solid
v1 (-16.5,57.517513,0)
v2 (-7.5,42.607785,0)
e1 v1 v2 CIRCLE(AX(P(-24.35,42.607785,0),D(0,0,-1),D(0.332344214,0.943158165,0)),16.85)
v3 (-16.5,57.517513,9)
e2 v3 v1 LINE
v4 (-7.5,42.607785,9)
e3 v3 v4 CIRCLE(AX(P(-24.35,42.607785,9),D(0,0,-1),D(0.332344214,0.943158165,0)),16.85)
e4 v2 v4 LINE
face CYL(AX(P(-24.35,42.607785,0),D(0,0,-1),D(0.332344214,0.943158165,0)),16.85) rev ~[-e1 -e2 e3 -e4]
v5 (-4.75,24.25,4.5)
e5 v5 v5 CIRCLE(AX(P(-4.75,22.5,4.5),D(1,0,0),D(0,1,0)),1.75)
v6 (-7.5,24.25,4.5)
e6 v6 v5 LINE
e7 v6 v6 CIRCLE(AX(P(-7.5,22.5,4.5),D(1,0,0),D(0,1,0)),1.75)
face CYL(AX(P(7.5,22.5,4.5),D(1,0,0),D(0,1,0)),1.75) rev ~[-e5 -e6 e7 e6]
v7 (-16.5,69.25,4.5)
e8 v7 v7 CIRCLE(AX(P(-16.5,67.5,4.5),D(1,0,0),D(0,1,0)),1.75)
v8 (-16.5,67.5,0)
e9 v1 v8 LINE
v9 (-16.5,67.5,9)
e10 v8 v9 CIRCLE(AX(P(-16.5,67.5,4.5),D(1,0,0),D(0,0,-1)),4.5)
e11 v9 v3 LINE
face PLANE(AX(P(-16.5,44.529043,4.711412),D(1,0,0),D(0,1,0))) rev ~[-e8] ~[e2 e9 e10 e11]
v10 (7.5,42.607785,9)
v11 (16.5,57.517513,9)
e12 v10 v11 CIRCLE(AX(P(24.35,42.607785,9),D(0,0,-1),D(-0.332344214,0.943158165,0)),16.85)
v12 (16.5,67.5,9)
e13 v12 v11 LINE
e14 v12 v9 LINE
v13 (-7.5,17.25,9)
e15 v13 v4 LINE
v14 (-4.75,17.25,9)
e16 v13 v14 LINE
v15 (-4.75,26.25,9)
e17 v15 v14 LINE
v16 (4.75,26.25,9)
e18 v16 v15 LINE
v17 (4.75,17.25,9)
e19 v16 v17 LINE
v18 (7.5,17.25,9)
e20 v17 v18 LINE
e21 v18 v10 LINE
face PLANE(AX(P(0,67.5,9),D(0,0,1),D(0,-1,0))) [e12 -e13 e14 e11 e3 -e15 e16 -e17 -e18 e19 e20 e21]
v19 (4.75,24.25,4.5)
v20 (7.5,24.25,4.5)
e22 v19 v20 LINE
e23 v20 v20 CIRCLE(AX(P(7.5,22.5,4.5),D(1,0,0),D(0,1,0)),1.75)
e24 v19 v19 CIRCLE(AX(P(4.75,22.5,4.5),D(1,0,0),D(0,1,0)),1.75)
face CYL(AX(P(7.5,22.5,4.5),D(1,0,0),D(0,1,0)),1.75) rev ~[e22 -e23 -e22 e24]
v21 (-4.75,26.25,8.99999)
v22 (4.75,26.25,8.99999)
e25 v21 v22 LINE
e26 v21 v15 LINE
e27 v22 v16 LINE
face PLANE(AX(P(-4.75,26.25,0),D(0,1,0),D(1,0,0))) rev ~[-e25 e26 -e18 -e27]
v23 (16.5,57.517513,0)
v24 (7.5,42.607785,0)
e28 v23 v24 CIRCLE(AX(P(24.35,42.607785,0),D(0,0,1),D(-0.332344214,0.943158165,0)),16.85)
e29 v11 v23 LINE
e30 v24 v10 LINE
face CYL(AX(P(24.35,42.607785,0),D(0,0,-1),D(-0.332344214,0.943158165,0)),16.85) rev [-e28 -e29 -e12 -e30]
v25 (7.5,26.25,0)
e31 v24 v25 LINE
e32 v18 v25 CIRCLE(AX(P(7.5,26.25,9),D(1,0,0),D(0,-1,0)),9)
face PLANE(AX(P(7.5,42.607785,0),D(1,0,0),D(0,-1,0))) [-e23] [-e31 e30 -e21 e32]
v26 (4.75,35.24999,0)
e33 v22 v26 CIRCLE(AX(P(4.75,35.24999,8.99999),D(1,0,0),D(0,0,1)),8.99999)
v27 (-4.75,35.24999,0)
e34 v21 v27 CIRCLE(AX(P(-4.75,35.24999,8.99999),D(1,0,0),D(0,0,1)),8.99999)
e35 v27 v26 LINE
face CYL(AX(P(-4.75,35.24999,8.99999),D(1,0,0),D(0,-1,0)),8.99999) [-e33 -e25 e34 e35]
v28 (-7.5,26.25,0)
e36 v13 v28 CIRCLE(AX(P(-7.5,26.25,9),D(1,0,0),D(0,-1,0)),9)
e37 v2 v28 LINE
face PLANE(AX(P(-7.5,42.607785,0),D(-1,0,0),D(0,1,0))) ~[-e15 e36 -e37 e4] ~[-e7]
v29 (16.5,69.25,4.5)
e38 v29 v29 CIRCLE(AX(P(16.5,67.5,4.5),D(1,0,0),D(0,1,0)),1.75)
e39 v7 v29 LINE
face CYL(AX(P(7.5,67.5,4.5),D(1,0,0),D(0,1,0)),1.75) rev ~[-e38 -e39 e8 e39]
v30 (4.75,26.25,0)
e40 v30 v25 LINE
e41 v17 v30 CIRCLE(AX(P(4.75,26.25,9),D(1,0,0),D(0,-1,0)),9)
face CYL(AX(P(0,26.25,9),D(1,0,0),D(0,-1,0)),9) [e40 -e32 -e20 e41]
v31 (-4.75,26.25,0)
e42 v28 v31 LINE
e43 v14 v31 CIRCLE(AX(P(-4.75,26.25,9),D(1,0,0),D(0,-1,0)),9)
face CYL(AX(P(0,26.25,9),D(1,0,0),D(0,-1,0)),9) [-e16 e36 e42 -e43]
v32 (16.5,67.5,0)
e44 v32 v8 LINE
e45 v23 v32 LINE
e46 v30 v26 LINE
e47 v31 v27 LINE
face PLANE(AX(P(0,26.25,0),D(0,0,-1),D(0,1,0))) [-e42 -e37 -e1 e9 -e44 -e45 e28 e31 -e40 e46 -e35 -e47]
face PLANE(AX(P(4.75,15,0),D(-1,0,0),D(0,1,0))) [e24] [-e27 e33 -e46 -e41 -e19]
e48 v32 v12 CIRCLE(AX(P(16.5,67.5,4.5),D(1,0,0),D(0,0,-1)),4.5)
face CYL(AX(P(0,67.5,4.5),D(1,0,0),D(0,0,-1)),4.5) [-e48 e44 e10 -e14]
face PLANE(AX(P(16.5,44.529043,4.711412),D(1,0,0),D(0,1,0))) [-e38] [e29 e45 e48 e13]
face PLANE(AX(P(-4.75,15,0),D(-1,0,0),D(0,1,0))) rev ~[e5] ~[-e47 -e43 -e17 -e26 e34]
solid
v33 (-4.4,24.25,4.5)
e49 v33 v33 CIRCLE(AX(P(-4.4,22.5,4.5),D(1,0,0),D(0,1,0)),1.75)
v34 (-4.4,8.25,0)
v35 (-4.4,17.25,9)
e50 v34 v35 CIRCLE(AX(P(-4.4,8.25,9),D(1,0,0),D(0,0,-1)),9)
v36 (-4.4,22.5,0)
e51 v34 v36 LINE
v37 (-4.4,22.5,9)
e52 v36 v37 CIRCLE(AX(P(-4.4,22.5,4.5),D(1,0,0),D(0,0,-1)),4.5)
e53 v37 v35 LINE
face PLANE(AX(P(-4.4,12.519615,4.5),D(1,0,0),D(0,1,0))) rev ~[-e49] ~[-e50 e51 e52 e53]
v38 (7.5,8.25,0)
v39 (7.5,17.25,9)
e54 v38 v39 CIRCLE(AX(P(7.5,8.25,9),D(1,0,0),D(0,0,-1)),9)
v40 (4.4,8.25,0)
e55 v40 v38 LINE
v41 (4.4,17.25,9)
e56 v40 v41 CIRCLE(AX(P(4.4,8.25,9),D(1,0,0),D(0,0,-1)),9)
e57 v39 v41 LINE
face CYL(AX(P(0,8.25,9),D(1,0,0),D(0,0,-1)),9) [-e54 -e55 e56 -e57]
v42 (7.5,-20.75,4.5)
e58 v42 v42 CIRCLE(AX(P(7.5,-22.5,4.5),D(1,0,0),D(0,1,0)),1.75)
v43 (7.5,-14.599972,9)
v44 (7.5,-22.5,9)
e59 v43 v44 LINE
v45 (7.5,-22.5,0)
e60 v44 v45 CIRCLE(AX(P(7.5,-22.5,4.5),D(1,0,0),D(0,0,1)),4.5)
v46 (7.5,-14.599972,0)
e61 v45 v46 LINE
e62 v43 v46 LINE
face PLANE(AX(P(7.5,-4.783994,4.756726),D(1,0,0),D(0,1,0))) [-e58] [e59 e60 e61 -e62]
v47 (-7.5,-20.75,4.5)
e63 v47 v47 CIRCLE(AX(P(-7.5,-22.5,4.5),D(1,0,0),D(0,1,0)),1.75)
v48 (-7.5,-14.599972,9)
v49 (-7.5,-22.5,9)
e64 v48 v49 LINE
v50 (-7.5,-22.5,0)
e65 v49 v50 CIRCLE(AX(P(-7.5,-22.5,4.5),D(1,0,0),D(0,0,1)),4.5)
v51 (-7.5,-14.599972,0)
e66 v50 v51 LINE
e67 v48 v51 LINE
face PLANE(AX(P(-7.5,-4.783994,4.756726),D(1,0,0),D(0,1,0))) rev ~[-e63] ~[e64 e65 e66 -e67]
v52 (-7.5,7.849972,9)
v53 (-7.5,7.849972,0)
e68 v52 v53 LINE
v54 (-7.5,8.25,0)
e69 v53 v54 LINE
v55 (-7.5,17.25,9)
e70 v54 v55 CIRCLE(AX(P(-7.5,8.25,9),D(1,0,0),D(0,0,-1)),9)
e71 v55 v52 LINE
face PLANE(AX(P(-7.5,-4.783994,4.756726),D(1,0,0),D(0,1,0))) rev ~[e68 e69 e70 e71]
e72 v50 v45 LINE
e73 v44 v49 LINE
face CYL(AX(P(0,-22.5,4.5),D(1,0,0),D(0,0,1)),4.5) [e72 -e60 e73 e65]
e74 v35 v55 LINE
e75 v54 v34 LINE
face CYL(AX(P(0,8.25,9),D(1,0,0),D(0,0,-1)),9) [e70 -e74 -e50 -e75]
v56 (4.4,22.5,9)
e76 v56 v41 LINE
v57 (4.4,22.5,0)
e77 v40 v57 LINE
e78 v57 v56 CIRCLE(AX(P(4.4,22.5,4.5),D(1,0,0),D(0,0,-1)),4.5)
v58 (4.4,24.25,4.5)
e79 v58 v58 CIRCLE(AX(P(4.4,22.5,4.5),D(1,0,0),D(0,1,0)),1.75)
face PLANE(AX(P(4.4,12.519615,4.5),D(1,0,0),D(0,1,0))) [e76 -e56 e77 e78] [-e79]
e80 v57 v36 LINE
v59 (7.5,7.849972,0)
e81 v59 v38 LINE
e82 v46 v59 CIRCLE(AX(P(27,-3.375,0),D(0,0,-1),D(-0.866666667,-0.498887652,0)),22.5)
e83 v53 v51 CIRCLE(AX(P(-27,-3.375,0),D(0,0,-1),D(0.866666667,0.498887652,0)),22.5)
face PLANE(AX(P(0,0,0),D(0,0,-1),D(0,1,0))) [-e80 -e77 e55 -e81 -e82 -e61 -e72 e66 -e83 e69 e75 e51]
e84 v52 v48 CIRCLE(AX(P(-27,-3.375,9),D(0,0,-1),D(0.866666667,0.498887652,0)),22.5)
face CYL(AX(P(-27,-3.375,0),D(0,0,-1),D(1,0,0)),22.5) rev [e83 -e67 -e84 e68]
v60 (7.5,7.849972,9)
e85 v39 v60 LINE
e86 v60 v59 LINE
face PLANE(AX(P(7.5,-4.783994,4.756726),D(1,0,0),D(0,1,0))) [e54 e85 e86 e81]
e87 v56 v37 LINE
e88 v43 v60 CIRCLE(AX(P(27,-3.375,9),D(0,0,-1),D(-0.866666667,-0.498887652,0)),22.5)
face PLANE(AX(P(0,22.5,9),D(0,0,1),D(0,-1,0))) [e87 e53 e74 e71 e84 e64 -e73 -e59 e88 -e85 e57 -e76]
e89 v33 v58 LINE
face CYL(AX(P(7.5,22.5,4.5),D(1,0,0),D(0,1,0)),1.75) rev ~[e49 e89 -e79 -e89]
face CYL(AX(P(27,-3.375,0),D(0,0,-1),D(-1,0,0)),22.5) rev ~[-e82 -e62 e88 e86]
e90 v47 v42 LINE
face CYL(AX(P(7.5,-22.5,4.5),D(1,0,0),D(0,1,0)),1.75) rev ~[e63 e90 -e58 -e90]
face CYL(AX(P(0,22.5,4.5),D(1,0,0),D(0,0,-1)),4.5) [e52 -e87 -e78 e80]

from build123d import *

# Parameters (mm, degrees)
F1_DEPTH  = 7.5
F3_DEPTH  = 4.4
F4_R      = 22.5
F5_DEPTH  = 25
F9_DEPTH  = 16.5
F11_DEPTH = 25
F13_W     = 9.5
F13_H     = 11.25
F14_DEPTH = 25
F16_R     = 8.99999
F17_R     = 1.75
F18_DEPTH = 40


# Not quite as in the source:
# - a fillet or chamfer is up to 0.001 mm smaller than in the source, because OpenCascade refuses the exact size


with BuildPart() as f1:
    # F0 (on Right) → F1 (new body, symmetric)
    with BuildSketch(Plane.YZ):
        with BuildLine():
            ThreePointArc((-22.5, 9), (-27, 4.5), (-22.5, 0))
            Line((-22.5, 0), (8.25, 0))
            ThreePointArc((8.25, 0), (14.6139610307, 2.6360389693), (17.25, 9))
            Line((17.25, 9), (-22.5, 9))
        make_face()
    extrude(amount=F1_DEPTH, both=True)

    # F2 (on Right) → F3 (join, symmetric)
    with BuildSketch(Plane.YZ):
        with BuildLine():
            Line((22.5, 9), (0, 9))
            Line((0, 9), (0, 0))
            Line((0, 0), (22.5, 0))
            ThreePointArc((22.5, 0), (27, 4.5), (22.5, 9))
        make_face()
    extrude(amount=F3_DEPTH, both=True)


with BuildPart() as f5:
    # F4 (on Top) → F5 (new body)
    with BuildSketch(Plane.XY):
        with Locations((-27, -3.375)):
            Circle(F4_R)
    extrude(amount=F5_DEPTH)


with BuildPart() as f6_1:
    # F6: instance of F5
    add(f5.part.mirror(Plane.YZ))


with BuildPart() as f1_1:
    add(f1.part)

    # F7: cut F6_1, F5
    add(f6_1.part, mode=Mode.SUBTRACT)
    add(f5.part, mode=Mode.SUBTRACT)


with BuildPart() as f9:
    # F8 (on Right) → F9 (new body, symmetric)
    with BuildSketch(Plane.YZ):
        with BuildLine():
            Line((67.5, 9), (17.25, 9))
            ThreePointArc((17.25, 9), (19.8860389693, 2.6360389693), (26.25, 0))
            Line((26.25, 0), (67.5, 0))
            ThreePointArc((67.5, 0), (72, 4.5), (67.5, 9))
        make_face()
    extrude(amount=F9_DEPTH, both=True)


with BuildPart() as f11:
    # F10 (on Top) → F11 (new body)
    with BuildSketch(Plane.XY):
        with BuildLine():
            Line((7.5, 42.6077849247), (7.5, 16.5))
            Line((7.5, 16.5), (18.75, 16.5))
            Line((18.75, 16.5), (18.75, 58.5))
            ThreePointArc((18.75, 58.5), (10.5971366618, 52.343351164), (7.5, 42.6077849247))
        make_face()
    extrude(amount=F11_DEPTH)


with BuildPart() as f12_1:
    # F12: instance of F11
    add(f11.part.mirror(Plane.YZ))


with BuildPart() as f14:
    # F13 (on Top) → F14 (new body)
    with BuildSketch(Plane.XY):
        with Locations((0, 20.625)):
            Rectangle(F13_W, F13_H)
    extrude(amount=F14_DEPTH)


with BuildPart() as f9_1:
    add(f9.part)

    # F15: cut F12_1, F11, F14
    add(f12_1.part, mode=Mode.SUBTRACT)
    add(f11.part, mode=Mode.SUBTRACT)
    add(f14.part, mode=Mode.SUBTRACT)

    # F16 (radius 9 in the source; OpenCascade refuses exactly that, so slightly less here)
    f16_edges = [f9_1.edges().sort_by_distance(p)[0] for p in [
        (6.125, 26.25, 0),
        (0, 26.25, 0),
        (-6.125, 26.25, 0),
    ]]
    fillet(f16_edges, radius=F16_R)


with BuildPart() as f18:
    # F17 (on face) → F18 (new body, symmetric)
    with BuildSketch(Plane.YZ.offset(7.5)):
        with Locations((-22.5, 4.5)):
            Circle(F17_R)
    extrude(amount=F18_DEPTH, both=True)


with BuildPart() as f18b:
    # F17 (on face) → F18, piece 2 (new body, symmetric)
    with BuildSketch(Plane.YZ.offset(7.5)):
        with Locations((22.5, 4.5)):
            Circle(F17_R)
    extrude(amount=F18_DEPTH, both=True)


with BuildPart() as f18c:
    # F17 (on face) → F18, piece 3 (new body, symmetric)
    with BuildSketch(Plane.YZ.offset(7.5)):
        with Locations((67.5, 4.5)):
            Circle(F17_R)
    extrude(amount=F18_DEPTH, both=True)


with BuildPart() as f1_2:
    add(f1_1.part)

    # F19: cut F18b, F18, F18c
    add(f18b.part, mode=Mode.SUBTRACT)
    add(f18.part, mode=Mode.SUBTRACT)
    add(f18c.part, mode=Mode.SUBTRACT)


with BuildPart() as f9_2:
    add(f9_1.part)

    # F19: cut F18b, F18, F18c
    add(f18b.part, mode=Mode.SUBTRACT)
    add(f18.part, mode=Mode.SUBTRACT)
    add(f18c.part, mode=Mode.SUBTRACT)


solid = Compound([f1_2.part, f9_2.part])
